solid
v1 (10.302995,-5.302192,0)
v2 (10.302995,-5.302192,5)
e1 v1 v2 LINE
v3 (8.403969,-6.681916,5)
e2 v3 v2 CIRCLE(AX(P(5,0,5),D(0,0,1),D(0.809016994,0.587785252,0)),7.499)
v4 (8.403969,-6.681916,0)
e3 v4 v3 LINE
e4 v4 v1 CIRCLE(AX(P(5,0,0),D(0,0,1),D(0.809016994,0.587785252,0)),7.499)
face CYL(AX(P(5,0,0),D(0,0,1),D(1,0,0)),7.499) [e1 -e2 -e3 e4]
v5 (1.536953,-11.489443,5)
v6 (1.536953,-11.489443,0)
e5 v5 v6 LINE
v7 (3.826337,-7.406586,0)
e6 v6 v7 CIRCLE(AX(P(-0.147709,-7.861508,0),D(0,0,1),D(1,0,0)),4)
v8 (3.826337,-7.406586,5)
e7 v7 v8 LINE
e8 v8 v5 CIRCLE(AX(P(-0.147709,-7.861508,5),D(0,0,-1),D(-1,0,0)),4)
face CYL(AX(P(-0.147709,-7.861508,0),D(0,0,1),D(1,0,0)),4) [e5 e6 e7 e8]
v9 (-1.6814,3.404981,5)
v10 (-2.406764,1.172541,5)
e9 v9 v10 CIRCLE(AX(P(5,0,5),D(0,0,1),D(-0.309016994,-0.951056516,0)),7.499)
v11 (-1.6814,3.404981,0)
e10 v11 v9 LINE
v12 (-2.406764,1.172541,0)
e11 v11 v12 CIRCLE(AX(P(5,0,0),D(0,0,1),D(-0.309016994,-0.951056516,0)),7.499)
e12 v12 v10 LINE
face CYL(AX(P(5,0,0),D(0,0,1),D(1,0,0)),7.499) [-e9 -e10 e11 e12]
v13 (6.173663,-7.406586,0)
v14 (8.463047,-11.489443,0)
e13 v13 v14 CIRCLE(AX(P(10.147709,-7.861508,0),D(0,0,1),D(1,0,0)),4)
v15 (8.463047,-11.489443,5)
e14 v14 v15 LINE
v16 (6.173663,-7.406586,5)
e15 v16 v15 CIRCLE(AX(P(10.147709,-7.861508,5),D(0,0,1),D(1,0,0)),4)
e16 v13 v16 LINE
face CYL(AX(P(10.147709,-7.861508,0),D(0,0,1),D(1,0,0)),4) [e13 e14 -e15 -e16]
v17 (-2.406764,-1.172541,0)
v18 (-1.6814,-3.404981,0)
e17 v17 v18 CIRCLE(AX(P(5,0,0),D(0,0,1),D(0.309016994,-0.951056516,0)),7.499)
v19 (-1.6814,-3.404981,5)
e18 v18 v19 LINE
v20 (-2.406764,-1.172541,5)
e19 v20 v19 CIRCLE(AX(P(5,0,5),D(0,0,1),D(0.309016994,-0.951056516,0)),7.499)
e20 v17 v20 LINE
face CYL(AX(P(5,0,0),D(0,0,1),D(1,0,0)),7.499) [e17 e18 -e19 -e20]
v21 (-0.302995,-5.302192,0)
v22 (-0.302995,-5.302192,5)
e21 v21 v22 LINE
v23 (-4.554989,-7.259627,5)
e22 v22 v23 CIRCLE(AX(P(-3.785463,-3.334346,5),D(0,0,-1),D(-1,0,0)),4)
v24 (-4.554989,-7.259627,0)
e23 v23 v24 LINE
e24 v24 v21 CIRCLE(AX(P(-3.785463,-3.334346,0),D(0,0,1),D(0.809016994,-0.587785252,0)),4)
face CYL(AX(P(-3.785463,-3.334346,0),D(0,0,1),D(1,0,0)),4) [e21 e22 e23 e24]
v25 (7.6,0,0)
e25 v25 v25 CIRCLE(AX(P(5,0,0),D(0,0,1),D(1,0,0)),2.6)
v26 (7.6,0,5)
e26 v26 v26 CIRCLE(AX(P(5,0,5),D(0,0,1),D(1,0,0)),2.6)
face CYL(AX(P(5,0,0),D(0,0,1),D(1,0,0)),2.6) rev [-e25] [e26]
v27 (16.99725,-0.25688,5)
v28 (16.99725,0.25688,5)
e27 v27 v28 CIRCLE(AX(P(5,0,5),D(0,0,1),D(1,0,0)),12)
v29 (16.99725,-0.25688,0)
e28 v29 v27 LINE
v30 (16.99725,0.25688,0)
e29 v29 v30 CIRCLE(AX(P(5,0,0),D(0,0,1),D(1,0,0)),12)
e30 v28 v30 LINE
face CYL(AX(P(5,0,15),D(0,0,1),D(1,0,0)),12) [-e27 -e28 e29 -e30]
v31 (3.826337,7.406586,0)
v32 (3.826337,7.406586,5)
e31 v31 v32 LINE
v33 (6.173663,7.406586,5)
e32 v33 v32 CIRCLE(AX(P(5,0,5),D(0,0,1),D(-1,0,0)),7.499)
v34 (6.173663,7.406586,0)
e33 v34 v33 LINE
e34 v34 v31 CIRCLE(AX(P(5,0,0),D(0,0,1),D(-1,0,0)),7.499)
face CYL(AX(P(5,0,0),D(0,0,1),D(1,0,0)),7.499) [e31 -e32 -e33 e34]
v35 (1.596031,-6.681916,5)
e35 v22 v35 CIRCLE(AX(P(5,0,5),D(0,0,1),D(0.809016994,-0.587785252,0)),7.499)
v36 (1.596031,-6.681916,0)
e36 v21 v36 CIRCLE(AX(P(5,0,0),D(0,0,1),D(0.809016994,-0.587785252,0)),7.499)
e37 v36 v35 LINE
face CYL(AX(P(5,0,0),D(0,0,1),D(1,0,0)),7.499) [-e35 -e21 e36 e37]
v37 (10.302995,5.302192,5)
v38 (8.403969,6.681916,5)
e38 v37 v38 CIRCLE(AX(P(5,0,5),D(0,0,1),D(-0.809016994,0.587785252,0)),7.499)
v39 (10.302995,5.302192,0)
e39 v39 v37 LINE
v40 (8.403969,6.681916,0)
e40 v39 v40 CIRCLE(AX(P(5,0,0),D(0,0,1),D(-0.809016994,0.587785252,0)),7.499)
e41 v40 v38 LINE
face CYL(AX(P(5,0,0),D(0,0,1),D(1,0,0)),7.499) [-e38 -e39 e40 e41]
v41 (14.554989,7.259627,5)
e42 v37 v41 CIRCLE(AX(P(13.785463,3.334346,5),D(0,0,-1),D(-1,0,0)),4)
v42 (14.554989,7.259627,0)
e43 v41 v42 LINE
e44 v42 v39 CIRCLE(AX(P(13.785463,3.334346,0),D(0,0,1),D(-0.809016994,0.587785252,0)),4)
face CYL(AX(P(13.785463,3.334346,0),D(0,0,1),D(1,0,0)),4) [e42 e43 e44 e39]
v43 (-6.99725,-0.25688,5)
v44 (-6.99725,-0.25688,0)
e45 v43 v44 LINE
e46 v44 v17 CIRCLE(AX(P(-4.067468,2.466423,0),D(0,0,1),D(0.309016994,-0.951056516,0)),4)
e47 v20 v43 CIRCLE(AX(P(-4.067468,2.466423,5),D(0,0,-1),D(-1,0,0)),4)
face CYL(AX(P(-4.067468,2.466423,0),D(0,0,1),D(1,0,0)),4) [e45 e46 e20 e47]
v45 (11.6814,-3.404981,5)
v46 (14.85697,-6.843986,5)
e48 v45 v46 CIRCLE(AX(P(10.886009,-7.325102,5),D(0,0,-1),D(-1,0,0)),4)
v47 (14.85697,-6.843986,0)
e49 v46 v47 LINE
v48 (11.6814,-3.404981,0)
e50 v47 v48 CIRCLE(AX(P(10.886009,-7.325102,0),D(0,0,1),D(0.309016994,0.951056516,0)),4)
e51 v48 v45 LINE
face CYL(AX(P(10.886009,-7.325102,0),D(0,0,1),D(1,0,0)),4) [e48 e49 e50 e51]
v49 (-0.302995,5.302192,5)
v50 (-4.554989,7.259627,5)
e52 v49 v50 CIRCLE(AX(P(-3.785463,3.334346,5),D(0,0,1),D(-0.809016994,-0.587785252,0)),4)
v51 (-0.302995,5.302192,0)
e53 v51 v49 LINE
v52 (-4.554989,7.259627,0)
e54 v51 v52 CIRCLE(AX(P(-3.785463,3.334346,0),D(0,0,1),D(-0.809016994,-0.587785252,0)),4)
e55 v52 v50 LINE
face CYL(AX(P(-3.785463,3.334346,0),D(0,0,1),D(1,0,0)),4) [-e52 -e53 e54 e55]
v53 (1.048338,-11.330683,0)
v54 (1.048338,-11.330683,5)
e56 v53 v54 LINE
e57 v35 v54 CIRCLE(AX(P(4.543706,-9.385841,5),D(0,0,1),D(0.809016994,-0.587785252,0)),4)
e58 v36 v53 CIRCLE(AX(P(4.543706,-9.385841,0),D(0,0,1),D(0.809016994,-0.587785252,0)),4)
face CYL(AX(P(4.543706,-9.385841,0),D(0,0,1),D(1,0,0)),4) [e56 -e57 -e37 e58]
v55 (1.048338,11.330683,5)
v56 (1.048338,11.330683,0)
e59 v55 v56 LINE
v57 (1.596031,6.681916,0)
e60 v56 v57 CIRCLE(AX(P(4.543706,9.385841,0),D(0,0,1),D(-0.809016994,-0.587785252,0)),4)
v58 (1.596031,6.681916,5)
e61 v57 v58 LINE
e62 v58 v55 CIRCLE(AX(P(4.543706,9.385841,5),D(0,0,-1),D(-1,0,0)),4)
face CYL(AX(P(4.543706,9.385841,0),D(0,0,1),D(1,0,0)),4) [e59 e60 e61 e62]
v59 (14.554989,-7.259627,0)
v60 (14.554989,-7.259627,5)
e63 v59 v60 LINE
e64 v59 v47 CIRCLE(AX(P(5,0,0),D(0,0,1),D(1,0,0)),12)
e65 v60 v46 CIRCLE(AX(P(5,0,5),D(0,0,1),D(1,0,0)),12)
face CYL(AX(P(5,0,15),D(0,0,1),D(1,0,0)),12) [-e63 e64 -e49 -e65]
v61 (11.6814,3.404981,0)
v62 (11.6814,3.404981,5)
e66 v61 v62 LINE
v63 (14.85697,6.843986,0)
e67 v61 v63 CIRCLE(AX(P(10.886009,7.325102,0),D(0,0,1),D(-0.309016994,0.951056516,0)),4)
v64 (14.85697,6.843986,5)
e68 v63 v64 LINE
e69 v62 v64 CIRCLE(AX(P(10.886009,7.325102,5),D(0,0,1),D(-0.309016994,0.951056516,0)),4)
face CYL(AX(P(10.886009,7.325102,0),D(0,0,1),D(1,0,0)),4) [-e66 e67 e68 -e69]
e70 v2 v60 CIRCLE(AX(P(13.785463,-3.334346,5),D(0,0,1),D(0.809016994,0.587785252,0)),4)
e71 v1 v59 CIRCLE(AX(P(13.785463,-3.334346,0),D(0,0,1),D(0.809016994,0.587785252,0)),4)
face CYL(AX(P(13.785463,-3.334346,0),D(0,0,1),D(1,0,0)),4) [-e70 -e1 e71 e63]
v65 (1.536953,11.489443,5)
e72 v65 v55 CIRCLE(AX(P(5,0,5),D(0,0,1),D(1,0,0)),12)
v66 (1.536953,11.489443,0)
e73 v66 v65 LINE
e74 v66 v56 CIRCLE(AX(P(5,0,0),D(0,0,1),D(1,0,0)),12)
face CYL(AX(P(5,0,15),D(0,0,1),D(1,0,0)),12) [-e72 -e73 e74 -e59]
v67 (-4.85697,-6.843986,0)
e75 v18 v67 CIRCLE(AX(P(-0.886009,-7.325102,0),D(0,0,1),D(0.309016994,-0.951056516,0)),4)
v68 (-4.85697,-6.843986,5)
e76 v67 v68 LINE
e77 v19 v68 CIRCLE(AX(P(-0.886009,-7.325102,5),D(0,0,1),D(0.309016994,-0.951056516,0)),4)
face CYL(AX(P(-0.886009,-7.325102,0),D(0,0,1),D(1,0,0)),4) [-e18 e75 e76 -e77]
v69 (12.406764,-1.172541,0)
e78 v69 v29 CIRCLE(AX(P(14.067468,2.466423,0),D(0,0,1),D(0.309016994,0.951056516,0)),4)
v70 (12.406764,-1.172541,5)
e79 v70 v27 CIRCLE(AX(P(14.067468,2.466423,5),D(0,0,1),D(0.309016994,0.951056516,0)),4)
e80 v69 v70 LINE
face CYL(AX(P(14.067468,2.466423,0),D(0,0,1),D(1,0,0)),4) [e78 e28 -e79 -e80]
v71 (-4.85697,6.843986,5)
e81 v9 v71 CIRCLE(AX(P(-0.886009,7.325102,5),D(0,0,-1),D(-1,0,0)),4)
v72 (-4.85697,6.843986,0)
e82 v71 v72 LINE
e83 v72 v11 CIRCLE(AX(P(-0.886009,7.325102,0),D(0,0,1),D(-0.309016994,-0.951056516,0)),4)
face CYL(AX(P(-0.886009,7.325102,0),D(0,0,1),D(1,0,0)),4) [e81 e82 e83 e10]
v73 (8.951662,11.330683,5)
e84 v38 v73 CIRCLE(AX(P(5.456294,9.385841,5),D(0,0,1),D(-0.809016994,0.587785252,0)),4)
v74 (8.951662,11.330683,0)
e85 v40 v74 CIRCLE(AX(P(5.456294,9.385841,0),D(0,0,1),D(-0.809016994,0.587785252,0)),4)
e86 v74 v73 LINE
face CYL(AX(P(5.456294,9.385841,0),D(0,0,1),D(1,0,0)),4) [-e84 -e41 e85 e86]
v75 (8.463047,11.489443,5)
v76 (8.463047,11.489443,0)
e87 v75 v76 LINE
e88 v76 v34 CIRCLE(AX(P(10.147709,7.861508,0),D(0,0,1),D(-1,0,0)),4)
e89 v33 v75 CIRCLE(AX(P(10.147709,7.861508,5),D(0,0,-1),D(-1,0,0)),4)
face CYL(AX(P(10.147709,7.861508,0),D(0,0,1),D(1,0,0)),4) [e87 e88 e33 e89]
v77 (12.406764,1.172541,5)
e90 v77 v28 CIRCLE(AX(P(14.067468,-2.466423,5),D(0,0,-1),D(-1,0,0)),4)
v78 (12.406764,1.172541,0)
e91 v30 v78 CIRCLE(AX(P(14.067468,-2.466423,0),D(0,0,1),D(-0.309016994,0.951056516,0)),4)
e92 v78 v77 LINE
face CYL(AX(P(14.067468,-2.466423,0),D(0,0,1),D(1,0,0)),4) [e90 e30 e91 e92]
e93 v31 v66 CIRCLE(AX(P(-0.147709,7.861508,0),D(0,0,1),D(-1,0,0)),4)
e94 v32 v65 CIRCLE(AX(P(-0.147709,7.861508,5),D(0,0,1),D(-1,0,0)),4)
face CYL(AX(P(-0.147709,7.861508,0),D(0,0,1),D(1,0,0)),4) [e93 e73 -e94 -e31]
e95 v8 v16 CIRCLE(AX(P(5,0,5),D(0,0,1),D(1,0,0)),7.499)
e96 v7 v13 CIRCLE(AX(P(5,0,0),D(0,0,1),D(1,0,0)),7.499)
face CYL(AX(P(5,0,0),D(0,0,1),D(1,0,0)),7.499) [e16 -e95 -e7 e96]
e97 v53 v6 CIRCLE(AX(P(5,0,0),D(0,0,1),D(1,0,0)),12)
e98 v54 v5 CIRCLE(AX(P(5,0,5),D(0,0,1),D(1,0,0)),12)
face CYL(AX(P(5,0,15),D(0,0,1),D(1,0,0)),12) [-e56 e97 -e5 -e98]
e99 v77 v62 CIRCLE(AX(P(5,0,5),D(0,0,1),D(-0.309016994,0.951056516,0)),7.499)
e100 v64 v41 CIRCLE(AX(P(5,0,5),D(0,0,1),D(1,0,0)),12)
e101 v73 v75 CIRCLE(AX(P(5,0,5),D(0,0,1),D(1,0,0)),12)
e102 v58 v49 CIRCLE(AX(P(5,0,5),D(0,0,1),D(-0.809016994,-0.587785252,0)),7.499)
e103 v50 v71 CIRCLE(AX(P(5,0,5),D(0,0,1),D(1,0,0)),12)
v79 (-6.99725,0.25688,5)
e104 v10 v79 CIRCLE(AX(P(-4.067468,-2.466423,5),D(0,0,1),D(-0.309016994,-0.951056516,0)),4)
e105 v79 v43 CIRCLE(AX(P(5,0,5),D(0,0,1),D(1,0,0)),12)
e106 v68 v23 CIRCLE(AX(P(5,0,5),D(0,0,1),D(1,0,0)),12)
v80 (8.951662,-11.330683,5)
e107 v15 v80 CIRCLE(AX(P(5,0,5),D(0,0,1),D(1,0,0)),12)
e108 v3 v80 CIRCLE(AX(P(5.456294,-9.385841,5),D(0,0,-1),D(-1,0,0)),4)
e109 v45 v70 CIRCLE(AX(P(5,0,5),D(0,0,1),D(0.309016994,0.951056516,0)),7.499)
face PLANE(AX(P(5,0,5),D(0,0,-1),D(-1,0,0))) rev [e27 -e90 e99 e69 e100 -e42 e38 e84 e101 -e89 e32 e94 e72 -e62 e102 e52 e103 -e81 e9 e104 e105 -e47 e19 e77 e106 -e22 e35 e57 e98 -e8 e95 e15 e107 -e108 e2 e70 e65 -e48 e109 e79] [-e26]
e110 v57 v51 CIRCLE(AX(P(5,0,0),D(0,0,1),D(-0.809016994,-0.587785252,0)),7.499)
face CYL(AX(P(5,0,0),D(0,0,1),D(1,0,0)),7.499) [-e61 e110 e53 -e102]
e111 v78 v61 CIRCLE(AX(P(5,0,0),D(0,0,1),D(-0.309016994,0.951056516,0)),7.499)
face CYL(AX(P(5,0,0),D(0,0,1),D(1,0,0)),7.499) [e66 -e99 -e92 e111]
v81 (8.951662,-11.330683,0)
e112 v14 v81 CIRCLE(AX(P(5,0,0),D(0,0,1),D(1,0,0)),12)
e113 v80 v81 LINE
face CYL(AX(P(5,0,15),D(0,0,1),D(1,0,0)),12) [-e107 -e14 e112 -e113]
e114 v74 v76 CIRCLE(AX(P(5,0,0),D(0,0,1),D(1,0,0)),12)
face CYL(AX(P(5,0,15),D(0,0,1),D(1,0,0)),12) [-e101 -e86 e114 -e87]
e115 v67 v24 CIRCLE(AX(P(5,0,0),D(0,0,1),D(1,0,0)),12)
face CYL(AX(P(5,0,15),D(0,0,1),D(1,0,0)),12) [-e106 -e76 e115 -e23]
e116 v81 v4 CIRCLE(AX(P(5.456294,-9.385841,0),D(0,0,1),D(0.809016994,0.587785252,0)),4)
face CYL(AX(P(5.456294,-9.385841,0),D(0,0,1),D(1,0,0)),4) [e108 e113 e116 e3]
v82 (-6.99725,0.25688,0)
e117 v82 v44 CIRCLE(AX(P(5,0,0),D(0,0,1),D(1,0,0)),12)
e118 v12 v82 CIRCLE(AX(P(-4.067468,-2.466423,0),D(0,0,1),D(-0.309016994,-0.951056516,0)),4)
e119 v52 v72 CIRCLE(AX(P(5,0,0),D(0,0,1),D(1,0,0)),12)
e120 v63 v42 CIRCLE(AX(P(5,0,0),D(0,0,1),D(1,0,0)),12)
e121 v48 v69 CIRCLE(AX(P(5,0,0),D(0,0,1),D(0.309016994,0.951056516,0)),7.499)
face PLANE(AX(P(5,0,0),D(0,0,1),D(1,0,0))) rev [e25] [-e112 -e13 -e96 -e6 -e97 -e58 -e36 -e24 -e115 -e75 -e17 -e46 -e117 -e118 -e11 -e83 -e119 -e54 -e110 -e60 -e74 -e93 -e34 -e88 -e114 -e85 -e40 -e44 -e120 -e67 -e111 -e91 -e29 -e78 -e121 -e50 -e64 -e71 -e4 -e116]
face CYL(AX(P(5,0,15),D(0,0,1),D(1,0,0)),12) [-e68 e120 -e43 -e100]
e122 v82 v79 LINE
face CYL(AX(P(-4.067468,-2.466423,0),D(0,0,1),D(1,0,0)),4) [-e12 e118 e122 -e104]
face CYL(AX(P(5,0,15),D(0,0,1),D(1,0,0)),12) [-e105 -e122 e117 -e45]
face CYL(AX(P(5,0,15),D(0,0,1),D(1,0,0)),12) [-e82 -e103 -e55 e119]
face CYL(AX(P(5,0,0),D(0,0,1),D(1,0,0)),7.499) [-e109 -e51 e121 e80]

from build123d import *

# Parameters (mm, degrees)
BASPROSKE_W                      = 5
BASPROSKE_H                      = 12
TOOTHCUT_DEPTH                   = 18.691806013
TEETHCUTS_COUNT                  = 10
TEETHCUTS_ANGLE                  = 324
BORSKE_R                         = 2.5
BORE_DEPTH                       = 50.0000508
S_LIDO_MOVER_COPIAR1_START       = -12
S_LIDO_MOVER_COPIAR1_OUTLINE_W   = 5
S_LIDO_MOVER_COPIAR1_OUTLINE_H   = 26
S_LIDO_MOVER_COPIAR1_DEPTH       = 12
S_LIDO_MOVER_COPIAR1_START_2     = 5
S_LIDO_MOVER_COPIAR1_2_OUTLINE_W = 5
S_LIDO_MOVER_COPIAR1_2_OUTLINE_H = 26
S_LIDO_MOVER_COPIAR1_2_DEPTH     = 7
S_LIDO_MOVER_COPIAR1_3_DEPTH     = 5
S_LIDO_MOVER_COPIAR1_4_OUTLINE_R = 2.5
S_LIDO_MOVER_COPIAR1_4_DEPTH     = 5
CROQUIS1_R                       = 2.6
CORTAR_EXTRUIR2_DEPTH            = 22.118885154


# Read off the part's stored shape, not the designer's step: Sólido-Mover/Copiar1
with BuildPart() as part:
    # BasProSke → Base-Revolve (revolve)
    with BuildSketch(Plane(origin=(0, 0, 0), x_dir=(1, 0, 0), z_dir=(0, 1, 0)), mode=Mode.PRIVATE) as base_revolve_sk:
        with Locations((2.5, 6)):
            Rectangle(BASPROSKE_W, BASPROSKE_H)
    revolve(base_revolve_sk.sketch.rotate(Axis((-10, 0, 0), (1, 0, 0)), 180), axis=Axis((-10, 0, 0), (1, 0, 0)))

    # TooCutSke → ToothCut (cut, through all)
    with BuildSketch(Plane(origin=(0, 0, 0), x_dir=(0, 0, -1), z_dir=(1, 0, 0))):
        with BuildLine():
            ThreePointArc((1.173662691, 7.406586048), (0, 7.499), (-1.173662691, 7.406586048))
            ThreePointArc((-1.173662691, 7.406586048), (-1.668191438, 9.834565786), (-3.497907776, 11.50542856))
            ThreePointArc((-3.497907776, 11.50542856), (0, 12.0254), (3.497907776, 11.50542856))
            ThreePointArc((3.497907776, 11.50542856), (1.668191438, 9.834565786), (1.173662691, 7.406586048))
        make_face()
    toothcut = extrude(amount=TOOTHCUT_DEPTH, mode=Mode.SUBTRACT)

    # TeethCuts: ToothCut ×10 about axis
    teethcuts_axis = Axis((-10, 0, 0), (1, 0, 0))
    for i in range(1, TEETHCUTS_COUNT):
        add(toothcut.rotate(teethcuts_axis, i * TEETHCUTS_ANGLE / (TEETHCUTS_COUNT - 1)), mode=Mode.SUBTRACT)

    # BorSke → Bore (cut, symmetric)
    with BuildSketch(Plane(origin=(0, 0, 0), x_dir=(0, 0, -1), z_dir=(1, 0, 0))):
        with Locations(Location((0, 0, 0), (0, 0, 180))):
            Circle(BORSKE_R)
    extrude(amount=BORE_DEPTH, both=True, mode=Mode.SUBTRACT)

    # Sólido-Mover/Copiar1 outline → Sólido-Mover/Copiar1 (cut)
    with BuildSketch(Plane.XY.offset(S_LIDO_MOVER_COPIAR1_START)):
        with Locations((2.5, 0)):
            Rectangle(S_LIDO_MOVER_COPIAR1_OUTLINE_W, S_LIDO_MOVER_COPIAR1_OUTLINE_H)
    extrude(amount=S_LIDO_MOVER_COPIAR1_DEPTH, mode=Mode.SUBTRACT)

    # S_lido-Mover_Copiar1 2 outline → S_lido-Mover_Copiar1 2 (cut)
    with BuildSketch(Plane.XY.offset(S_LIDO_MOVER_COPIAR1_START_2)):
        with Locations((2.5, 0)):
            Rectangle(S_LIDO_MOVER_COPIAR1_2_OUTLINE_W, S_LIDO_MOVER_COPIAR1_2_OUTLINE_H)
    extrude(amount=S_LIDO_MOVER_COPIAR1_2_DEPTH, mode=Mode.SUBTRACT)

    # S_lido-Mover_Copiar1 3 outline → S_lido-Mover_Copiar1 3 (cut)
    with BuildSketch(Plane.XY):
        with BuildLine():
            Line((0, 13), (0, 5.588828232))
            ThreePointArc((0, 5.588828232), (0.762620659, 6.187052394), (1.596031014, 6.681915604))
            ThreePointArc((1.596031014, 6.681915604), (0.571180494, 8.917819898), (1.0483384, 11.330682707))
            ThreePointArc((1.0483384, 11.330682707), (1.291796067, 11.412678196), (1.536953197, 11.489443278))
            ThreePointArc((1.536953197, 11.489443278), (3.341227227, 9.817862641), (3.826337309, 7.406586048))
            ThreePointArc((3.826337309, 7.406586048), (4.411352302, 7.475860812), (5, 7.499))
            Line((5, 7.499), (5, 13))
            Line((5, 13), (0, 13))
        make_face()
        with BuildLine():
            ThreePointArc((1.596031014, -6.681915604), (0.762620659, -6.187052394), (0, -5.588828232))
            Line((0, -5.588828232), (0, -13))
            Line((0, -13), (5, -13))
            Line((5, -13), (5, -7.499))
            ThreePointArc((5, -7.499), (4.411352302, -7.475860812), (3.826337309, -7.406586048))
            ThreePointArc((3.826337309, -7.406586048), (3.341227227, -9.817862641), (1.536953197, -11.489443278))
            ThreePointArc((1.536953197, -11.489443278), (1.291796067, -11.412678196), (1.0483384, -11.330682707))
            ThreePointArc((1.0483384, -11.330682707), (0.571180494, -8.917819898), (1.596031014, -6.681915604))
        make_face()
        with BuildLine():
            Line((5, -2.5), (5, 2.5))
            ThreePointArc((5, 2.5), (2.5, 0), (5, -2.5))
        make_face()
    extrude(amount=S_LIDO_MOVER_COPIAR1_3_DEPTH, mode=Mode.SUBTRACT)

    # S_lido-Mover_Copiar1 4 outline → S_lido-Mover_Copiar1 4 (add)
    with BuildSketch(Plane.XY):
        with BuildLine():
            ThreePointArc((-2.406763642, 1.172541409), (-4.849931218, 1.456299749), (-6.997250213, 0.256880001))
            ThreePointArc((-6.997250213, 0.256880001), (-7, 0), (-6.997250213, -0.256880001))
            ThreePointArc((-6.997250213, -0.256880001), (-4.849931218, -1.456299749), (-2.406763642, -1.172541409))
            ThreePointArc((-2.406763642, -1.172541409), (-2.131972816, -2.317318441), (-1.681400207, -3.404980509))
            ThreePointArc((-1.681400207, -3.404980509), (-3.824753264, -4.61147306), (-4.856969584, -6.843986457))
            ThreePointArc((-4.856969584, -6.843986457), (-4.708203933, -7.053423027), (-4.554989032, -7.259627029))
            ThreePointArc((-4.554989032, -7.259627029), (-2.112770233, -6.967815552), (-0.302995112, -5.302192362))
            ThreePointArc((-0.302995112, -5.302192362), (0.592198393, -6.066818441), (1.596031014, -6.681915604))
            ThreePointArc((1.596031014, -6.681915604), (0.571180494, -8.917819898), (1.0483384, -11.330682707))
            ThreePointArc((1.0483384, -11.330682707), (1.291796067, -11.412678196), (1.536953197, -11.489443278))
            ThreePointArc((1.536953197, -11.489443278), (3.341227227, -9.817862641), (3.826337309, -7.406586048))
            ThreePointArc((3.826337309, -7.406586048), (5, -7.499), (6.173662691, -7.406586048))
            ThreePointArc((6.173662691, -7.406586048), (6.658772773, -9.817862641), (8.463046803, -11.489443278))
            ThreePointArc((8.463046803, -11.489443278), (8.708203933, -11.412678196), (8.9516616, -11.330682707))
            ThreePointArc((8.9516616, -11.330682707), (9.428819506, -8.917819898), (8.403968986, -6.681915604))
            ThreePointArc((8.403968986, -6.681915604), (9.407801607, -6.066818441), (10.302995112, -5.302192362))
            ThreePointArc((10.302995112, -5.302192362), (12.112770233, -6.967815552), (14.554989032, -7.259627029))
            ThreePointArc((14.554989032, -7.259627029), (14.708203933, -7.053423027), (14.856969584, -6.843986457))
            ThreePointArc((14.856969584, -6.843986457), (13.824753264, -4.61147306), (11.681400207, -3.404980509))
            ThreePointArc((11.681400207, -3.404980509), (12.131972816, -2.317318441), (12.406763642, -1.172541409))
            ThreePointArc((12.406763642, -1.172541409), (14.849931218, -1.456299749), (16.997250213, -0.256880001))
            ThreePointArc((16.997250213, -0.256880001), (17, 0), (16.997250213, 0.256880001))
            ThreePointArc((16.997250213, 0.256880001), (14.849931218, 1.456299749), (12.406763642, 1.172541409))
            ThreePointArc((12.406763642, 1.172541409), (12.131972816, 2.317318441), (11.681400207, 3.404980509))
            ThreePointArc((11.681400207, 3.404980509), (13.824753264, 4.61147306), (14.856969584, 6.843986457))
            ThreePointArc((14.856969584, 6.843986457), (14.708203933, 7.053423027), (14.554989032, 7.259627029))
            ThreePointArc((14.554989032, 7.259627029), (12.112770233, 6.967815552), (10.302995112, 5.302192362))
            ThreePointArc((10.302995112, 5.302192362), (9.407801607, 6.066818441), (8.403968986, 6.681915604))
            ThreePointArc((8.403968986, 6.681915604), (9.428819506, 8.917819898), (8.9516616, 11.330682707))
            ThreePointArc((8.9516616, 11.330682707), (8.708203933, 11.412678196), (8.463046803, 11.489443278))
            ThreePointArc((8.463046803, 11.489443278), (6.658772773, 9.817862641), (6.173662691, 7.406586048))
            ThreePointArc((6.173662691, 7.406586048), (5, 7.499), (3.826337309, 7.406586048))
            ThreePointArc((3.826337309, 7.406586048), (3.341227227, 9.817862641), (1.536953197, 11.489443278))
            ThreePointArc((1.536953197, 11.489443278), (1.291796067, 11.412678196), (1.0483384, 11.330682707))
            ThreePointArc((1.0483384, 11.330682707), (0.571180494, 8.917819898), (1.596031014, 6.681915604))
            ThreePointArc((1.596031014, 6.681915604), (0.592198393, 6.066818441), (-0.302995112, 5.302192362))
            ThreePointArc((-0.302995112, 5.302192362), (-2.112770233, 6.967815552), (-4.554989032, 7.259627029))
            ThreePointArc((-4.554989032, 7.259627029), (-4.708203933, 7.053423027), (-4.856969584, 6.843986457))
            ThreePointArc((-4.856969584, 6.843986457), (-3.824753264, 4.61147306), (-1.681400207, 3.404980509))
            ThreePointArc((-1.681400207, 3.404980509), (-2.131972816, 2.317318441), (-2.406763642, 1.172541409))
        make_face()
        with Locations((5, 0)):
            Circle(S_LIDO_MOVER_COPIAR1_4_OUTLINE_R, mode=Mode.SUBTRACT)
    extrude(amount=S_LIDO_MOVER_COPIAR1_4_DEPTH)

    # Croquis1 → Cortar-Extruir2 (cut, through all)
    with BuildSketch(Plane.XY.offset(5)):
        with Locations((5, 0)):
            Circle(CROQUIS1_R)
    extrude(amount=-CORTAR_EXTRUIR2_DEPTH, mode=Mode.SUBTRACT)


solid = part.part
